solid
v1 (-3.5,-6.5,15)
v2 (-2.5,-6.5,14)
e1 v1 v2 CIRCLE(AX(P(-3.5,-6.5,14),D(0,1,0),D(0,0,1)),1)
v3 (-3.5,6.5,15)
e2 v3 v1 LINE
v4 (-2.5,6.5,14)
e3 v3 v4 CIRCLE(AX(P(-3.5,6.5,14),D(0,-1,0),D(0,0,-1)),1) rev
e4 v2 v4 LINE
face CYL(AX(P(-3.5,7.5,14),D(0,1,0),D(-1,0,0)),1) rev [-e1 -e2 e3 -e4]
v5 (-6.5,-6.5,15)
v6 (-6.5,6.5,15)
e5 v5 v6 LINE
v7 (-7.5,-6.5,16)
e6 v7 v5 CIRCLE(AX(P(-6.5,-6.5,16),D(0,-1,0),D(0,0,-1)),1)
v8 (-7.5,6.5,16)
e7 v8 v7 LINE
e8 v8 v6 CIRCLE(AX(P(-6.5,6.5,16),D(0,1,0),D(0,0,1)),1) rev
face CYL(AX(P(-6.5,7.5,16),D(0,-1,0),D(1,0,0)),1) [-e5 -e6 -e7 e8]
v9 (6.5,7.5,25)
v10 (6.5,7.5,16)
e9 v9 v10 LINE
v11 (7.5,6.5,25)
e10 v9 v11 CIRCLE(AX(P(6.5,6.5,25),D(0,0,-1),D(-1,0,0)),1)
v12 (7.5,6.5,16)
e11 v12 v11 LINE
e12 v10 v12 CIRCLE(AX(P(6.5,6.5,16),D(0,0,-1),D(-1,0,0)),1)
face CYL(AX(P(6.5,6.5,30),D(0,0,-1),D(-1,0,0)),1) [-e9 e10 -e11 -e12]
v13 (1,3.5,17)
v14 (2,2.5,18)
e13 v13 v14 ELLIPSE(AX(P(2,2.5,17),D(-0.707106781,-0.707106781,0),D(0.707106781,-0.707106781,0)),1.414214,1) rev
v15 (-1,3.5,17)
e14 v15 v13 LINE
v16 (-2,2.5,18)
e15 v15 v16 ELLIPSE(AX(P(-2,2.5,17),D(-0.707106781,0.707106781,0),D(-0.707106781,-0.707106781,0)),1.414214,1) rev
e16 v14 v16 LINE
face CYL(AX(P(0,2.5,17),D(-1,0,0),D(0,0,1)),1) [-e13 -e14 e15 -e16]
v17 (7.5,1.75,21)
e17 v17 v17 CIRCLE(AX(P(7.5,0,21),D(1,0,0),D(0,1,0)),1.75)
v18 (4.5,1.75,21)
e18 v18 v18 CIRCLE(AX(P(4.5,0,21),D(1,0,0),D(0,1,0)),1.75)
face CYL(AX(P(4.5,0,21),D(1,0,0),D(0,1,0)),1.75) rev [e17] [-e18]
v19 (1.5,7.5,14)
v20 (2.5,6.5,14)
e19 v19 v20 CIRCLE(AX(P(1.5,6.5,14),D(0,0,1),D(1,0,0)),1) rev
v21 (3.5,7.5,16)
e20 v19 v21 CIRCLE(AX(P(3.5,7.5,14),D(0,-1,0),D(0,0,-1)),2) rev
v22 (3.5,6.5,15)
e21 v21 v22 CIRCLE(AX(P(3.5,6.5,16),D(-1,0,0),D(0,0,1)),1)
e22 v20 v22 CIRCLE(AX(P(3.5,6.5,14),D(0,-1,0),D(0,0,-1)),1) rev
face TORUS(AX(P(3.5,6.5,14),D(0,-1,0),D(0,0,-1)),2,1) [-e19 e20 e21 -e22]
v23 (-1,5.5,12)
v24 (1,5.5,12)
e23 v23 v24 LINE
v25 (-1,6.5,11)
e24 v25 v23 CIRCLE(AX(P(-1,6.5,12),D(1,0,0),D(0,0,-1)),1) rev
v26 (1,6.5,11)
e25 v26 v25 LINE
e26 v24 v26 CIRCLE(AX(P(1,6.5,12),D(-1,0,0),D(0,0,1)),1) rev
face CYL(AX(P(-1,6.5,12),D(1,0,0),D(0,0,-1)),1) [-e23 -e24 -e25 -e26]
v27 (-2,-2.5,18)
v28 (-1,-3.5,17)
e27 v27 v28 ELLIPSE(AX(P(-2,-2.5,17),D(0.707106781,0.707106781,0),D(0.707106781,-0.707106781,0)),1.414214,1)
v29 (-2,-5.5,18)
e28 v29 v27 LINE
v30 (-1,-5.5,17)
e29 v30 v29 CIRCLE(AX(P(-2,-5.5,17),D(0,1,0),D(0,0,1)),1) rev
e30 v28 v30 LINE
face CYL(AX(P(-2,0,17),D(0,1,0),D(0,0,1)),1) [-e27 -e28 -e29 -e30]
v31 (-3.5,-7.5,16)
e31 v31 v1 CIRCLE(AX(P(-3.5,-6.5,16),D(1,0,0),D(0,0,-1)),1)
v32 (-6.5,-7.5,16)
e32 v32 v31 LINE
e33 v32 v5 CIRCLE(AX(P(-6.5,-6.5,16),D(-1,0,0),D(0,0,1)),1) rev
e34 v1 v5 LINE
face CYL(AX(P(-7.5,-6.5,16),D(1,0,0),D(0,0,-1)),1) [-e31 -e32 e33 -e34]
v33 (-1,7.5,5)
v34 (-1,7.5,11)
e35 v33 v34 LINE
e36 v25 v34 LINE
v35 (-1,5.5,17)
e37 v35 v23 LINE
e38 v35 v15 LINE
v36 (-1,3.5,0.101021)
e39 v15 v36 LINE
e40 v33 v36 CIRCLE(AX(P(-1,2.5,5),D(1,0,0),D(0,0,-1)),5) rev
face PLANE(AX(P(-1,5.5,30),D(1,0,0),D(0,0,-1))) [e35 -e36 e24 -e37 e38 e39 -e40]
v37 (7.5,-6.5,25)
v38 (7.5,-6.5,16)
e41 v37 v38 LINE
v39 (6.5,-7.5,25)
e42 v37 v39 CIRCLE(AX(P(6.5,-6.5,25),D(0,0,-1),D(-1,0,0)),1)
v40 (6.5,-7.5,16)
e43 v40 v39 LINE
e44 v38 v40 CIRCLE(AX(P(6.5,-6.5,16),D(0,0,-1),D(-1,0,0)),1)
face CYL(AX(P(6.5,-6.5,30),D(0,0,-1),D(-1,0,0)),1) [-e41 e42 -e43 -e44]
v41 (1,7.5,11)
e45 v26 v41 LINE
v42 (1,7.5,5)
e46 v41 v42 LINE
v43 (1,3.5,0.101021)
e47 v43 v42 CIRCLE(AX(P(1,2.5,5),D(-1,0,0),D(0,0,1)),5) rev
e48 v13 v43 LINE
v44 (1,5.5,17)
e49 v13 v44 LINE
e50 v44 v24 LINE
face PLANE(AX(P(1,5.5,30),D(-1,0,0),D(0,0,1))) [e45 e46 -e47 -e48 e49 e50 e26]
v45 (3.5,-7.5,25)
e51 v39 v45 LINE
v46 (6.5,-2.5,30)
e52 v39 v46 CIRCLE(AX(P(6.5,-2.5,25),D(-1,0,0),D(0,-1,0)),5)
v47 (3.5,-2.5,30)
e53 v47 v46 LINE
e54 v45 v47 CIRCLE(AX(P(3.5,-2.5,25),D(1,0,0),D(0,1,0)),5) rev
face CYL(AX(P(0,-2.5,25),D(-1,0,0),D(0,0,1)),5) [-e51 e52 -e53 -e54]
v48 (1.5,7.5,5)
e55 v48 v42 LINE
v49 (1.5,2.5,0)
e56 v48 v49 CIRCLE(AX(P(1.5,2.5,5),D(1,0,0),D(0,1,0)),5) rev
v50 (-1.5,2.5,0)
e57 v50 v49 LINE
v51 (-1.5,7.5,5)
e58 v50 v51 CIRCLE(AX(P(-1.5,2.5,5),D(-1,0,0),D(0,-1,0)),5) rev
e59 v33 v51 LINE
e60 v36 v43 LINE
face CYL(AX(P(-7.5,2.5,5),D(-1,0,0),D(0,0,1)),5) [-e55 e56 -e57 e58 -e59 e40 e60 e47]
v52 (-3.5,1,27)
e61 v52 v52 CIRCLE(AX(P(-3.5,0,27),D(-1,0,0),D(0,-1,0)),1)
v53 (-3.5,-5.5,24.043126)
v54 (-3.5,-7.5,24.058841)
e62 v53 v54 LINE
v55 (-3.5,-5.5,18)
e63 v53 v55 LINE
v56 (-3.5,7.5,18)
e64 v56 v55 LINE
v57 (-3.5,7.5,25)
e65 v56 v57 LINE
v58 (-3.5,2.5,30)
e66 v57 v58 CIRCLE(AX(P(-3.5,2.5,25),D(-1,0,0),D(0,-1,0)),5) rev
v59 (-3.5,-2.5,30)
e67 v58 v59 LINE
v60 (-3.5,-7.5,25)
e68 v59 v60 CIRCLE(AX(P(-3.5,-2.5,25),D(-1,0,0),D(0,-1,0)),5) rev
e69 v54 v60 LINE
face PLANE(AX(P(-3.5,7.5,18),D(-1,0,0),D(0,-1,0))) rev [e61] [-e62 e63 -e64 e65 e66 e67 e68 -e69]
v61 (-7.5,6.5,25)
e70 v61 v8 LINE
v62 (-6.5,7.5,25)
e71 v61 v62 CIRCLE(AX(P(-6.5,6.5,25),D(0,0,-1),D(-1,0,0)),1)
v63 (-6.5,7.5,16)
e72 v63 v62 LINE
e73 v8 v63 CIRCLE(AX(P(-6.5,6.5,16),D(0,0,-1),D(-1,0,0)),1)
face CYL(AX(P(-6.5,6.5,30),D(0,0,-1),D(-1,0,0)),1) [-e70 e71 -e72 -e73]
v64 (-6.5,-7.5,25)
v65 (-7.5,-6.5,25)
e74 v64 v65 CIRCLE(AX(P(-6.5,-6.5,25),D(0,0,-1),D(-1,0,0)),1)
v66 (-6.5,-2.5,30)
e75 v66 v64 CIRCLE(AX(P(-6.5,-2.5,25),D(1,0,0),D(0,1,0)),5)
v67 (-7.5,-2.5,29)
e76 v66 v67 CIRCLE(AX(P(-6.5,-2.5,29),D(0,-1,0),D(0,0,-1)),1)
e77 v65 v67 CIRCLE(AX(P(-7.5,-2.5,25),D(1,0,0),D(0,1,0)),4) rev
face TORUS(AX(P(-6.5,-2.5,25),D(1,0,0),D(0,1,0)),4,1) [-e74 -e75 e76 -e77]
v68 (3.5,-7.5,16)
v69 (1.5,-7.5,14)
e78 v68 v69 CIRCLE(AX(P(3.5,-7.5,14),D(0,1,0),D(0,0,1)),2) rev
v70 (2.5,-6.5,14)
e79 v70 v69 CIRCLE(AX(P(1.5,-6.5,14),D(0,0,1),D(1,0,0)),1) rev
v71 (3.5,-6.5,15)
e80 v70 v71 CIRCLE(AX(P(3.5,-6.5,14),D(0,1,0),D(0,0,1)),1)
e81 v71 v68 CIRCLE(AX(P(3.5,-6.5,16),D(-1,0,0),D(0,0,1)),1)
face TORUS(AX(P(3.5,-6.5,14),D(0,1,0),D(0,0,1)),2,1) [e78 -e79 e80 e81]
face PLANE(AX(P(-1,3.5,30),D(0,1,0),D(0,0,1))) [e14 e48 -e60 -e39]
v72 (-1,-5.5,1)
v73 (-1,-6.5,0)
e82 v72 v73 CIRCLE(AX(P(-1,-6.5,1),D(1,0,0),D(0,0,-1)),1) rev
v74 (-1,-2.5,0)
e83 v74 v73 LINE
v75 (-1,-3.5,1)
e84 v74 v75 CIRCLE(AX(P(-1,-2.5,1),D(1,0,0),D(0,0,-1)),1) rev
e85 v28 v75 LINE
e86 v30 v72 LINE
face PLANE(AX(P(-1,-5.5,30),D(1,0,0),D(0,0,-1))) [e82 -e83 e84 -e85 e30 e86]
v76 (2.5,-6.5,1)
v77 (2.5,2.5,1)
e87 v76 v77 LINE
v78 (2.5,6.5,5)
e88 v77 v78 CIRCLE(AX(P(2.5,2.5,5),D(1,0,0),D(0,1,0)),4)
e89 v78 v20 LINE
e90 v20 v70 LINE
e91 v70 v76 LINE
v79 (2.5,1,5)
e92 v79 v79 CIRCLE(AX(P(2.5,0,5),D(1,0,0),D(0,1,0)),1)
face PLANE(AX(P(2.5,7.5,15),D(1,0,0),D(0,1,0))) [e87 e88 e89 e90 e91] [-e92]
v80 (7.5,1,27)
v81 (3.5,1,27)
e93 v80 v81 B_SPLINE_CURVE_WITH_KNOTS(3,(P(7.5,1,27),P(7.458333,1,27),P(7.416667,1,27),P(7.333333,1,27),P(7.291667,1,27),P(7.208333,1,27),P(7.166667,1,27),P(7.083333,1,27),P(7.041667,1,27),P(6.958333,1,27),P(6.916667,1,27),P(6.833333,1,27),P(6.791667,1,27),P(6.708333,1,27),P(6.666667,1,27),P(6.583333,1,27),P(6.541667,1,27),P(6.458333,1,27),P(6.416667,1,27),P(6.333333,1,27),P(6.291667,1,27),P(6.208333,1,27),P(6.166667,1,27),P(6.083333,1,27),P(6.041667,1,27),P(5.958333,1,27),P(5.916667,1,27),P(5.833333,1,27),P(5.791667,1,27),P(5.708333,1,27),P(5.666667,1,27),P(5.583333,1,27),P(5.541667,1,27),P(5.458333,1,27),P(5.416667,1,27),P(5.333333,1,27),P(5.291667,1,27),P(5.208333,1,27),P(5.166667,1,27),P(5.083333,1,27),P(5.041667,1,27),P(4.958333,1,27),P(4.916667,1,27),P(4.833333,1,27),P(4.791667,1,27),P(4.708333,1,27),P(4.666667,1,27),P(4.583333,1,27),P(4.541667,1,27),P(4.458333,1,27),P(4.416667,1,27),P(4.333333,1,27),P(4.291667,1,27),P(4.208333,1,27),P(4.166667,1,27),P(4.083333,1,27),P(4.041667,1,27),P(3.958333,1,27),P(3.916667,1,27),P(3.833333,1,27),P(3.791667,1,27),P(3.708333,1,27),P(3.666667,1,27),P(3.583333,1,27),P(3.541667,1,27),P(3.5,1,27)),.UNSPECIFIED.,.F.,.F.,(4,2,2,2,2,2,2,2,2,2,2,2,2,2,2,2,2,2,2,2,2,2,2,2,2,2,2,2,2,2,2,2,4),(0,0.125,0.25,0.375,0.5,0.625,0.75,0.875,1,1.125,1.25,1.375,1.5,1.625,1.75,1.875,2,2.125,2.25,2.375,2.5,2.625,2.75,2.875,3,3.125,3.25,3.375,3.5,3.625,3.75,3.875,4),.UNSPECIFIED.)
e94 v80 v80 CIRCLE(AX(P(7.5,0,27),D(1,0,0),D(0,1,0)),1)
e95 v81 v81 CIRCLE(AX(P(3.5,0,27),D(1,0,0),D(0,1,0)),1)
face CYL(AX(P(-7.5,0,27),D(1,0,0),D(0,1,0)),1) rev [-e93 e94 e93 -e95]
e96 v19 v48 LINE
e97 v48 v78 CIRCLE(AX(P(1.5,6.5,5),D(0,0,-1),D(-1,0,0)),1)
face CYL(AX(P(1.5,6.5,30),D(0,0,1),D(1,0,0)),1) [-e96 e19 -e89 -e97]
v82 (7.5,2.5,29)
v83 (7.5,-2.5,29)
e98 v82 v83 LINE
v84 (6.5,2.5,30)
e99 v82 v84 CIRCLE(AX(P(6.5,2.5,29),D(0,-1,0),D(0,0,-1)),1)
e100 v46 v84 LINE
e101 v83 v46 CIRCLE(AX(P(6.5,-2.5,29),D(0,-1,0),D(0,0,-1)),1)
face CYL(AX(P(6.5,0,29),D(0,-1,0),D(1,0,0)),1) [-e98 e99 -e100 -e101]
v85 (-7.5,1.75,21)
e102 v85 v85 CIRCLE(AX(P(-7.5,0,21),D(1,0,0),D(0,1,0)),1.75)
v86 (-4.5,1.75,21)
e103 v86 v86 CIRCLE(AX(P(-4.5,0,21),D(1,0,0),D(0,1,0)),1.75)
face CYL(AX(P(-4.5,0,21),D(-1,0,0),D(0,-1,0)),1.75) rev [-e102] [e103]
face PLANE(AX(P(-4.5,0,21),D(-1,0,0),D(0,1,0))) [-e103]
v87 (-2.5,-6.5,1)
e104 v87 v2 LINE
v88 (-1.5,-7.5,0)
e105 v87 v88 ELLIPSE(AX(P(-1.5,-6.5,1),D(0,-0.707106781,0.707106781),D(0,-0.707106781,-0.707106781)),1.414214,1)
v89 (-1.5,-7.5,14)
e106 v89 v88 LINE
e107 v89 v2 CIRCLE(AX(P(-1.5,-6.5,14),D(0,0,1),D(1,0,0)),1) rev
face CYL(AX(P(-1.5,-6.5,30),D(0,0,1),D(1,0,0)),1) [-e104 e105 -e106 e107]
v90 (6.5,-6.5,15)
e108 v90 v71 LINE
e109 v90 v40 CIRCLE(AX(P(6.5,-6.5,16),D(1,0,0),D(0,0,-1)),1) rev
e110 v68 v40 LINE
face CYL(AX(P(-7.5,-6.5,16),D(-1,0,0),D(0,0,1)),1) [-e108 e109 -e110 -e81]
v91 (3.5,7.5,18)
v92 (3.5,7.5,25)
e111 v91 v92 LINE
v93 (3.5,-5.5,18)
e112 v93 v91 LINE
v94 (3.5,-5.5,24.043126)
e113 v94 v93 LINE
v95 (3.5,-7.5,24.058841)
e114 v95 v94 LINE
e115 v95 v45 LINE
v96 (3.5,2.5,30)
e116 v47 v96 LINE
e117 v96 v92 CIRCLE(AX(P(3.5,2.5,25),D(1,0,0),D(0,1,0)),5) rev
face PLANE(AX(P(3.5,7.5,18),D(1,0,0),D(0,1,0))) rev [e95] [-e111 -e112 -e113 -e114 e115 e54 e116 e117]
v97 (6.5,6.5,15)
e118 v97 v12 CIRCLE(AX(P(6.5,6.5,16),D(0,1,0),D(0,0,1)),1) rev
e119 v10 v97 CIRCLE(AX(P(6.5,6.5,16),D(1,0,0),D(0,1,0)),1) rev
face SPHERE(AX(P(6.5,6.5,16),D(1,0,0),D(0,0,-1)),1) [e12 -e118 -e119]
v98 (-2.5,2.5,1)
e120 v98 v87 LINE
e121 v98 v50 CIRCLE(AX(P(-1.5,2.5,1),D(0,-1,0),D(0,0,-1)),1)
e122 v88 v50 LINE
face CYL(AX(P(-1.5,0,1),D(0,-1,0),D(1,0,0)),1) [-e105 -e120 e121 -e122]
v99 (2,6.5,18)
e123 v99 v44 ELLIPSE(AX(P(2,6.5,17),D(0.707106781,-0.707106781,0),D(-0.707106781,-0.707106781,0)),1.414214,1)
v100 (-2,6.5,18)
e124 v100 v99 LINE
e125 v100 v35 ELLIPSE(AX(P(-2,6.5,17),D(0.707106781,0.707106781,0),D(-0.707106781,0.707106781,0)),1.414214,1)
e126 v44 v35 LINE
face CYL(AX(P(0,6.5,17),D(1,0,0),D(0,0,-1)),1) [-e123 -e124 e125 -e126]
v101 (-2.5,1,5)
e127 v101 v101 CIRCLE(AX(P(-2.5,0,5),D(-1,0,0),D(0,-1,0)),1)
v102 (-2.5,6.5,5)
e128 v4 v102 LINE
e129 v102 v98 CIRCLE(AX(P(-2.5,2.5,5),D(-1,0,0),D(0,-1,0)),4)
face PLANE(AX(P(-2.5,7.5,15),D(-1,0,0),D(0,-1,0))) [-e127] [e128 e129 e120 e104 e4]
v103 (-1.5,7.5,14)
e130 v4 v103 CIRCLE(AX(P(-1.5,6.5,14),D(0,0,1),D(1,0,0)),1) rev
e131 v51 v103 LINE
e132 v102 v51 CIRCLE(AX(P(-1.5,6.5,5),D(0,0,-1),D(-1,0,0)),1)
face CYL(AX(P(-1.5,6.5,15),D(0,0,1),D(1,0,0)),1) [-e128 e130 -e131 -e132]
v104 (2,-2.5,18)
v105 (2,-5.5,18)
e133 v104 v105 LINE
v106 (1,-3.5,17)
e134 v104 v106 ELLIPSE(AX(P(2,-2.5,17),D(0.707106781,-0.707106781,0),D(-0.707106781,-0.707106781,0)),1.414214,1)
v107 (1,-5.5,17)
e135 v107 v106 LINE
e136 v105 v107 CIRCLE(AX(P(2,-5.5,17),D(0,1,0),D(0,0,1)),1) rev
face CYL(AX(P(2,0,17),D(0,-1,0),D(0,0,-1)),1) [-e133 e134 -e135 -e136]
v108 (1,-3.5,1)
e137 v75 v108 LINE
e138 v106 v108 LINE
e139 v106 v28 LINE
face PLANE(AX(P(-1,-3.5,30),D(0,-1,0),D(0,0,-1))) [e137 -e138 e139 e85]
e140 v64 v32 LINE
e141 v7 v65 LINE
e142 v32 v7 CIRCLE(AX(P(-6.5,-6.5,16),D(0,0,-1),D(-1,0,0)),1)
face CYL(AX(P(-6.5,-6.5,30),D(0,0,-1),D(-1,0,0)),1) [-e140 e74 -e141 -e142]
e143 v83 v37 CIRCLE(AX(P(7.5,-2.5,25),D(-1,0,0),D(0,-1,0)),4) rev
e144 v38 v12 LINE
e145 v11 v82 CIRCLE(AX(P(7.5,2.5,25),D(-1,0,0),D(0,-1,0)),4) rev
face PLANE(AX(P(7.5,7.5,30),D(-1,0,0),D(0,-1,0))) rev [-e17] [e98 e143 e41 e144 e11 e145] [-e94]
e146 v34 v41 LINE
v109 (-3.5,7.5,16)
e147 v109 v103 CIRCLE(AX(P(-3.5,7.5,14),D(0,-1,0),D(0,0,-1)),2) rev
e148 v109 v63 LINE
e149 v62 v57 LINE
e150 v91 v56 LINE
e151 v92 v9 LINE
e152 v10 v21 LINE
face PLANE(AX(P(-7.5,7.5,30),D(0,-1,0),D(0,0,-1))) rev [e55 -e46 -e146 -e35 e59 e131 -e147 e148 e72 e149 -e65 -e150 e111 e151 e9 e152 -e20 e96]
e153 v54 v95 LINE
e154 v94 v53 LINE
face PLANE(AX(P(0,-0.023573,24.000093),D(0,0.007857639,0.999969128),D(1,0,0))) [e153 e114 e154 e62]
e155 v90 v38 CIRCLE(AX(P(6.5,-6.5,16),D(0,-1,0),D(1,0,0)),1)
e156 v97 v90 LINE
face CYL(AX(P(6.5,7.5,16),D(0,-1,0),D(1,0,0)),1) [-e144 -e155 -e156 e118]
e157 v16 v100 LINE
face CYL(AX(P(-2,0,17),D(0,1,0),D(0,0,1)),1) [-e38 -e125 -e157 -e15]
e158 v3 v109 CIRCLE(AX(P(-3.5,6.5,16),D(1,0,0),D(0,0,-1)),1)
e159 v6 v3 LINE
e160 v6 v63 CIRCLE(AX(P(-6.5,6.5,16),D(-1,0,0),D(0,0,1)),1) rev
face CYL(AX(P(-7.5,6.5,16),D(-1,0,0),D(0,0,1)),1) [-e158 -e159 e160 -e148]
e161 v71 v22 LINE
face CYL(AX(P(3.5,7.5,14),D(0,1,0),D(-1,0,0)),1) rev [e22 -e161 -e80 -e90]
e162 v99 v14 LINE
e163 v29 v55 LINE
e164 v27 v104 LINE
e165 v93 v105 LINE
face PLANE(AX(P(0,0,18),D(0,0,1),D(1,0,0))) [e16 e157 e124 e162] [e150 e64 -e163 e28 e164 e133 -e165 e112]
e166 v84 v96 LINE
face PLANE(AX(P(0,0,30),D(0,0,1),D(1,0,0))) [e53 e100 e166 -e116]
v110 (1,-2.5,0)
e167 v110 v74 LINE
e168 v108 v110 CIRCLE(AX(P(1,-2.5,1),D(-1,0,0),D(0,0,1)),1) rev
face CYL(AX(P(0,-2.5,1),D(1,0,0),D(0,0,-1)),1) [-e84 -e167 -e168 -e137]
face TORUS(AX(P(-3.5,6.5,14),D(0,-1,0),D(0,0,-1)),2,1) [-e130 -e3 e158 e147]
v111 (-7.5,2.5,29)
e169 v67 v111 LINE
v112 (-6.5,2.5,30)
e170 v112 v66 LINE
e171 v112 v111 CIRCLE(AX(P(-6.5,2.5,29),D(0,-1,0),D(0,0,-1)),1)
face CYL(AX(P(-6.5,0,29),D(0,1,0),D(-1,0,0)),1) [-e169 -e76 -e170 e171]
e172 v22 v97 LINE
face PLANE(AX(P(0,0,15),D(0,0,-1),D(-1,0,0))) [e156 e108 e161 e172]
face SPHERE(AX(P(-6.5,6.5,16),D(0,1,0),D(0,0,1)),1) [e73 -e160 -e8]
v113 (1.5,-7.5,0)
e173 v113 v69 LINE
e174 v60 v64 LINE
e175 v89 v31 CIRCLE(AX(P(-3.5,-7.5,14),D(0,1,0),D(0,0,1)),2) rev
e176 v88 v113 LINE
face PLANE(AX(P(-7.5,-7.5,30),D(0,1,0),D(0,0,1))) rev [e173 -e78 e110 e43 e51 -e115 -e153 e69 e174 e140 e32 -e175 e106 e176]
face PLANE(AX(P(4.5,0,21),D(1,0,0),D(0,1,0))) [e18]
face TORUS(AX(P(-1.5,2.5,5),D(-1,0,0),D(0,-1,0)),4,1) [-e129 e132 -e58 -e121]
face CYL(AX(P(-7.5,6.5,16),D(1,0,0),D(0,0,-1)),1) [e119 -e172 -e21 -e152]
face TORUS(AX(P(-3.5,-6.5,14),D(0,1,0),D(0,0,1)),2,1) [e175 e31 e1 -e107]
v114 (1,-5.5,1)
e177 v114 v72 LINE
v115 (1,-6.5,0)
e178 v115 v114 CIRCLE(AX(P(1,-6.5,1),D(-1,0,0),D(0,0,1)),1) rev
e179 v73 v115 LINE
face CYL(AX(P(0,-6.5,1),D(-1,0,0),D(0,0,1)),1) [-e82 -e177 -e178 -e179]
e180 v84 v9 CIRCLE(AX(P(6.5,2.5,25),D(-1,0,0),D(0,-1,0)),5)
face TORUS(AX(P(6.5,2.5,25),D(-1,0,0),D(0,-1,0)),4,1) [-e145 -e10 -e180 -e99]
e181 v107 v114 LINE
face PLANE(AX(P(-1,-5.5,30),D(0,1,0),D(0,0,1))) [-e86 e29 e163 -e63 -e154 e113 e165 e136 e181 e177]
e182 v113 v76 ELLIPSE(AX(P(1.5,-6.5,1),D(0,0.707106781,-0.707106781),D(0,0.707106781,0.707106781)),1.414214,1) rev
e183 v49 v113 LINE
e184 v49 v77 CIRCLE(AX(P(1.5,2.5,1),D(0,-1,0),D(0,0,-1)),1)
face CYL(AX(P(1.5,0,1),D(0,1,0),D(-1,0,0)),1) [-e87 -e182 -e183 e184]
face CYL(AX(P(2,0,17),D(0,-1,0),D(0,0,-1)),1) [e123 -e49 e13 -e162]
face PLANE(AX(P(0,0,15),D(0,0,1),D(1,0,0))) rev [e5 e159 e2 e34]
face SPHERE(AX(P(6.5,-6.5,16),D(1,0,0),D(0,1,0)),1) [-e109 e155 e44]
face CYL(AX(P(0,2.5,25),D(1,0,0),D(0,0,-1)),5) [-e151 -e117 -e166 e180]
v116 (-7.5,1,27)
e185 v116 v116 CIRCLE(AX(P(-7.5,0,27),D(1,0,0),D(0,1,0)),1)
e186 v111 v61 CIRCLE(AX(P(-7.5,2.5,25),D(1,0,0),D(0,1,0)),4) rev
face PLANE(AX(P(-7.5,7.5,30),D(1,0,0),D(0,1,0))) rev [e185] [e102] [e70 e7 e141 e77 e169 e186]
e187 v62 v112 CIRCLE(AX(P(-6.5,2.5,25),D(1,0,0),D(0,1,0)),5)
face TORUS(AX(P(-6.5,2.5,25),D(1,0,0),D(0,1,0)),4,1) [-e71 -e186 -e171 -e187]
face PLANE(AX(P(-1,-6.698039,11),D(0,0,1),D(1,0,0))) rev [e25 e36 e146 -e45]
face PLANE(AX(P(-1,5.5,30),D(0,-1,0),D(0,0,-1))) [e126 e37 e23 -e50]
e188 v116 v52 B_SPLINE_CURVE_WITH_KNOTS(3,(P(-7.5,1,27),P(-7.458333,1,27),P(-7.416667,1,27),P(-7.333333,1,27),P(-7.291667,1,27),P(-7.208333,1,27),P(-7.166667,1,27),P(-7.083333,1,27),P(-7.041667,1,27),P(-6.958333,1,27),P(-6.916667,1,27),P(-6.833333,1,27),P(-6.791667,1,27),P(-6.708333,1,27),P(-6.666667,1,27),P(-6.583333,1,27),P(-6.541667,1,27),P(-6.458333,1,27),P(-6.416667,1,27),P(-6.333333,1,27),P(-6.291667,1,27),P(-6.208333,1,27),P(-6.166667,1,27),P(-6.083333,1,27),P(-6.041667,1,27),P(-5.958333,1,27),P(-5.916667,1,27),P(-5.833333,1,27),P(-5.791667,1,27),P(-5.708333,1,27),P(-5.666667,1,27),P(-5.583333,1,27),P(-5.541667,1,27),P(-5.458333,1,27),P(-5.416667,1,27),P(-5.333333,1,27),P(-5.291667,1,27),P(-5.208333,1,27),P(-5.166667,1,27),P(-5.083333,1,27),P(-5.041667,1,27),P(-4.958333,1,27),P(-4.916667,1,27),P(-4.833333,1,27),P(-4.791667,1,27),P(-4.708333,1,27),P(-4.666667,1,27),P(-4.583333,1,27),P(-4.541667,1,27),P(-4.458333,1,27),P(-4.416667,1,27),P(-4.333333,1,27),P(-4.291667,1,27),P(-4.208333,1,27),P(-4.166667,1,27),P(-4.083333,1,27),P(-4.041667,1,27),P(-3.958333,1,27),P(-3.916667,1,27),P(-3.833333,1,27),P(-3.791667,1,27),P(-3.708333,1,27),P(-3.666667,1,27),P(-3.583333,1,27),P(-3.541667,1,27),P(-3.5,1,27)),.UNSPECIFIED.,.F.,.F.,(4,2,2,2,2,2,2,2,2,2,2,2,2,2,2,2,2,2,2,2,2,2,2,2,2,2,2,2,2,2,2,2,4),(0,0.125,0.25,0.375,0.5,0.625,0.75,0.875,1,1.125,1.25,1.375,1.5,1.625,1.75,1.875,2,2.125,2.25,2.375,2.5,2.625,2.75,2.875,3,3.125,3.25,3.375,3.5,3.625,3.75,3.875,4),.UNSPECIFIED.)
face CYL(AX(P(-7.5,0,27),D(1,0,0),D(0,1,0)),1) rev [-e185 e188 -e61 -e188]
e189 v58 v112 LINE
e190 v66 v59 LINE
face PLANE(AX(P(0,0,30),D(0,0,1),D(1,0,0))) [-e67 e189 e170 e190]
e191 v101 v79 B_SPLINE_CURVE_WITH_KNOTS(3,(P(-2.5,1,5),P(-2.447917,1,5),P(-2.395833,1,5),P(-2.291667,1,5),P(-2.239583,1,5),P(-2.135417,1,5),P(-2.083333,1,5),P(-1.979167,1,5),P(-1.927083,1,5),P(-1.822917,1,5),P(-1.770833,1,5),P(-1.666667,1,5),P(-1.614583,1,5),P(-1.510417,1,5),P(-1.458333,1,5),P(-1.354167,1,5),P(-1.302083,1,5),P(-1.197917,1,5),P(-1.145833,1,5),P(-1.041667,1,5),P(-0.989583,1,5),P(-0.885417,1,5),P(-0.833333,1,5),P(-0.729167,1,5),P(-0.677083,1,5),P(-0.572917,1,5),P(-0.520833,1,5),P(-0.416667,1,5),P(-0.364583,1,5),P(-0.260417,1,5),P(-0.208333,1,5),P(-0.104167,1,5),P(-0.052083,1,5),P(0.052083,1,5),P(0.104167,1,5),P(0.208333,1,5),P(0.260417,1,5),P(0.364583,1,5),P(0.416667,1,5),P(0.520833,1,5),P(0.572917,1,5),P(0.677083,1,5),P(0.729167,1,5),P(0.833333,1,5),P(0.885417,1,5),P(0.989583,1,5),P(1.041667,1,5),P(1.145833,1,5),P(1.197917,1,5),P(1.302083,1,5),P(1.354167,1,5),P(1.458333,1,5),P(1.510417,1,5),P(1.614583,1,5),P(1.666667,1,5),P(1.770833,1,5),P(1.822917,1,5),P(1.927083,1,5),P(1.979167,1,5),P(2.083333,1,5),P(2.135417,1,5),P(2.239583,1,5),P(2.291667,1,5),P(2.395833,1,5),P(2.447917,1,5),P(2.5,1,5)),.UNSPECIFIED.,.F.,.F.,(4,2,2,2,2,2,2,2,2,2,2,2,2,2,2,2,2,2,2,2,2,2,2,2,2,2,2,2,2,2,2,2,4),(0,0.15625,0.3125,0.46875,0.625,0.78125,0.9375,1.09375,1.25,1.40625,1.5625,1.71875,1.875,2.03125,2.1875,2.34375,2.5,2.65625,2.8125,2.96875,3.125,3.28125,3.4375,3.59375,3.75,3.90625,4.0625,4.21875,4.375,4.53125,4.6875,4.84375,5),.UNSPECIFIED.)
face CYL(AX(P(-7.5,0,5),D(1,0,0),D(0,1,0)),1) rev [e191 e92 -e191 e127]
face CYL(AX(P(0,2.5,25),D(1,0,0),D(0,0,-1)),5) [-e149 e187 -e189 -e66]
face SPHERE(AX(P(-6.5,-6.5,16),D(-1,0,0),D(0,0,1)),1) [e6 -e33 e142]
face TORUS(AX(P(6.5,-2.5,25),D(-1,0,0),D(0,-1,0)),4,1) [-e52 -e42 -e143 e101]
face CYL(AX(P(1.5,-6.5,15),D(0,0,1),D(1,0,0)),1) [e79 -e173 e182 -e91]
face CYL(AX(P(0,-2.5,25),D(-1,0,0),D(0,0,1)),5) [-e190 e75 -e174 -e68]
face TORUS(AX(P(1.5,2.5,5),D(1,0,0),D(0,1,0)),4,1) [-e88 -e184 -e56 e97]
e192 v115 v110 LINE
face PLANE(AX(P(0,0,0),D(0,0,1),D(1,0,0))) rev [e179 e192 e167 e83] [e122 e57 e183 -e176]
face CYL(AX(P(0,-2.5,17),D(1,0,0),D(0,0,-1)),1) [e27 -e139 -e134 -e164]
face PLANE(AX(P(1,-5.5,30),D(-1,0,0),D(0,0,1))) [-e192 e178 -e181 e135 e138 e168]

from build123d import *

# Parameters (mm, degrees)
BASE_SKETCH_W                        = 15
BASE_SKETCH_H                        = 15
BASE_SKETCH_EXTRUDE_DEPTH            = 30
CENTER_NUB_CUTOUT_SKETCH_W           = 5
CENTER_NUB_CUTOUT_SKETCH_H           = 15
HINGE_NUB_EXTRUDED_CUT_DEPTH         = 15
HINGE_CUTOUT_SKETCH_W                = 7
HINGE_CUTOUT_SKETCH_H                = 15
HINGE_CUTOUT_EXTRUDED_CUT_DEPTH      = 12
HINGE_HOLE_SKETCH_R                  = 1
HINGE_HOLE_EXTRUDED_CUT_DEPTH        = 35.369317712
CORNER_FILLETS_R                     = 5
STYLE_FILLETS_R                      = 1
ROUTING_HOLES_SKETCH_W               = 2
ROUTING_HOLES_SKETCH_H               = 2
ROUTING_HOLES_EXTRUDED_CUT_DEPTH     = 32.819805153
BACKING_START                        = -3.5
BACKING_EXTRUDE_DEPTH                = 7
EXTRA_ROUTING_CUT_SKETCH_W           = 2
EXTRA_ROUTING_CUT_SKETCH_H           = 10
EXTRA_ROUTING_EXTRUDED_CUT_DEPTH     = 4
ROUTING_FILLETS_R                    = 1
SKETCH2_R                            = 1.75
MIDDLE_SECTION_CONNECTION_HOLE_DEPTH = 3


# Read off the part's stored shape, not the designer's step: Backing Extrude
with BuildPart() as part:
    # Base Sketch → Base Sketch Extrude (new body)
    with BuildSketch(Plane.XY):
        Rectangle(BASE_SKETCH_W, BASE_SKETCH_H)
    extrude(amount=BASE_SKETCH_EXTRUDE_DEPTH)

    # Center Nub Cutout Sketch → Hinge Nub Extruded Cut (cut)
    with BuildSketch(Plane.XY):
        with Locations((5, 0)):
            Rectangle(CENTER_NUB_CUTOUT_SKETCH_W, CENTER_NUB_CUTOUT_SKETCH_H)
        with Locations((-5, 0)):
            Rectangle(CENTER_NUB_CUTOUT_SKETCH_W, CENTER_NUB_CUTOUT_SKETCH_H)
    extrude(amount=HINGE_NUB_EXTRUDED_CUT_DEPTH, mode=Mode.SUBTRACT)

    # Hinge Cutout Sketch → Hinge Cutout Extruded Cut (cut)
    with BuildSketch(Plane.XY.offset(30)):
        Rectangle(HINGE_CUTOUT_SKETCH_W, HINGE_CUTOUT_SKETCH_H)
    extrude(amount=-HINGE_CUTOUT_EXTRUDED_CUT_DEPTH, mode=Mode.SUBTRACT)

    # Hinge Hole Sketch → Hinge Hole Extruded Cut (cut, through all)
    with BuildSketch(Plane(origin=(7.5, 0, 0), x_dir=(0, 0, -1), z_dir=(1, 0, 0))):
        with Locations(Location((-5, 0, 0), (0, 0, 90))):
            Circle(HINGE_HOLE_SKETCH_R)
        with Locations(Location((-27, 0, 0), (0, 0, 90))):
            Circle(HINGE_HOLE_SKETCH_R)
    extrude(amount=-HINGE_HOLE_EXTRUDED_CUT_DEPTH, mode=Mode.SUBTRACT)

    # Corner Fillets
    corner_fillets_edges = [part.edges().sort_by_distance(p)[0] for p in [
        (0, 7.5, 0),
        (-5.5, -7.5, 30),
        (-5.5, 7.5, 30),
        (5.5, -7.5, 30),
        (5.5, 7.5, 30),
    ]]
    fillet(corner_fillets_edges, radius=CORNER_FILLETS_R)

    # Style Fillets
    style_fillets_edges = [part.edges().sort_by_distance(p)[0] for p in [
        (2.5, 7.5, 10),
        (2.5, -7.5, 7.5),
        (7.5, 0, 15),
        (5, 7.5, 15),
        (2.5, 0, 15),
        (5, -7.5, 15),
        (-2.5, -2.5, 0),
        (-2.5, -7.5, 7.5),
        (-2.5, 7.5, 10),
        (-7.5, 0, 15),
        (-5, -7.5, 15),
        (-2.5, 0, 15),
        (-5, 7.5, 15),
        (-7.5, 0, 30),
        (-7.5, -7.5, 20),
        (7.5, -7.5, 20),
        (-7.5, 7.5, 20),
        (-7.5, 6.035533906, 28.535533906),
        (-7.5, -6.035533906, 28.535533906),
        (7.5, 7.5, 20),
        (7.5, 0, 30),
        (7.5, 6.035533906, 28.535533906),
        (7.5, -6.035533906, 28.535533906),
        (-2.5, 6.035533906, 1.464466094),
        (2.5, -2.5, 0),
        (2.5, 6.035533906, 1.464466094),
    ]]
    fillet(style_fillets_edges, radius=STYLE_FILLETS_R)

    # Routing Holes Sketch → Routing Holes Extruded Cut (cut, through all)
    with BuildSketch(Plane.XY):
        with Locations((0, 4.5)):
            Rectangle(ROUTING_HOLES_SKETCH_W, ROUTING_HOLES_SKETCH_H)
        with Locations((0, -4.5)):
            Rectangle(ROUTING_HOLES_SKETCH_W, ROUTING_HOLES_SKETCH_H)
    extrude(amount=ROUTING_HOLES_EXTRUDED_CUT_DEPTH, mode=Mode.SUBTRACT)

    # Backing Extrude outline → Backing Extrude (add)
    with BuildSketch(Plane.YZ.offset(BACKING_START)):
        Polygon((-7.5, 24.05884149), (-7.5, 18), (-5.5, 18), (-5.5, 24.043125728), align=None)
    extrude(amount=BACKING_EXTRUDE_DEPTH)

    # Extra Routing Cut Sketch → Extra Routing Extruded Cut (cut)
    with BuildSketch(Plane(origin=(0, 7.5, 0), x_dir=(1, 0, 0), z_dir=(0, 1, 0))):
        with Locations((0, -6)):
            Rectangle(EXTRA_ROUTING_CUT_SKETCH_W, EXTRA_ROUTING_CUT_SKETCH_H)
    extrude(amount=-EXTRA_ROUTING_EXTRUDED_CUT_DEPTH, mode=Mode.SUBTRACT)

    # Routing Fillets
    routing_fillets_edges = [part.edges().sort_by_distance(p)[0] for p in [
        (-1, -4.5, 18),
        (0, -3.5, 18),
        (1, -4.5, 18),
        (-1, 4.5, 18),
        (0, 3.5, 18),
        (1, 4.5, 18),
        (0, 5.5, 18),
        (0, -5.5, 0),
        (0, -3.5, 0),
        (0, 5.5, 11),
    ]]
    fillet(routing_fillets_edges, radius=ROUTING_FILLETS_R)

    # Sketch2 → Middle Section Connection Hole (cut)
    with BuildSketch(Plane(origin=(7.5, 0, 0), x_dir=(0, 0, -1), z_dir=(1, 0, 0))):
        with Locations(Location((-21, 0, 0), (0, 0, 90))):
            Circle(SKETCH2_R)
    middle_section_connection_hole = extrude(amount=-MIDDLE_SECTION_CONNECTION_HOLE_DEPTH, mode=Mode.SUBTRACT)

    # Mirror1: Middle Section Connection Hole across plane
    add(middle_section_connection_hole.mirror(Plane(origin=(0, 0, 0), x_dir=(0, 0, 1), z_dir=(1, 0, 0))), mode=Mode.SUBTRACT)


solid = part.part
